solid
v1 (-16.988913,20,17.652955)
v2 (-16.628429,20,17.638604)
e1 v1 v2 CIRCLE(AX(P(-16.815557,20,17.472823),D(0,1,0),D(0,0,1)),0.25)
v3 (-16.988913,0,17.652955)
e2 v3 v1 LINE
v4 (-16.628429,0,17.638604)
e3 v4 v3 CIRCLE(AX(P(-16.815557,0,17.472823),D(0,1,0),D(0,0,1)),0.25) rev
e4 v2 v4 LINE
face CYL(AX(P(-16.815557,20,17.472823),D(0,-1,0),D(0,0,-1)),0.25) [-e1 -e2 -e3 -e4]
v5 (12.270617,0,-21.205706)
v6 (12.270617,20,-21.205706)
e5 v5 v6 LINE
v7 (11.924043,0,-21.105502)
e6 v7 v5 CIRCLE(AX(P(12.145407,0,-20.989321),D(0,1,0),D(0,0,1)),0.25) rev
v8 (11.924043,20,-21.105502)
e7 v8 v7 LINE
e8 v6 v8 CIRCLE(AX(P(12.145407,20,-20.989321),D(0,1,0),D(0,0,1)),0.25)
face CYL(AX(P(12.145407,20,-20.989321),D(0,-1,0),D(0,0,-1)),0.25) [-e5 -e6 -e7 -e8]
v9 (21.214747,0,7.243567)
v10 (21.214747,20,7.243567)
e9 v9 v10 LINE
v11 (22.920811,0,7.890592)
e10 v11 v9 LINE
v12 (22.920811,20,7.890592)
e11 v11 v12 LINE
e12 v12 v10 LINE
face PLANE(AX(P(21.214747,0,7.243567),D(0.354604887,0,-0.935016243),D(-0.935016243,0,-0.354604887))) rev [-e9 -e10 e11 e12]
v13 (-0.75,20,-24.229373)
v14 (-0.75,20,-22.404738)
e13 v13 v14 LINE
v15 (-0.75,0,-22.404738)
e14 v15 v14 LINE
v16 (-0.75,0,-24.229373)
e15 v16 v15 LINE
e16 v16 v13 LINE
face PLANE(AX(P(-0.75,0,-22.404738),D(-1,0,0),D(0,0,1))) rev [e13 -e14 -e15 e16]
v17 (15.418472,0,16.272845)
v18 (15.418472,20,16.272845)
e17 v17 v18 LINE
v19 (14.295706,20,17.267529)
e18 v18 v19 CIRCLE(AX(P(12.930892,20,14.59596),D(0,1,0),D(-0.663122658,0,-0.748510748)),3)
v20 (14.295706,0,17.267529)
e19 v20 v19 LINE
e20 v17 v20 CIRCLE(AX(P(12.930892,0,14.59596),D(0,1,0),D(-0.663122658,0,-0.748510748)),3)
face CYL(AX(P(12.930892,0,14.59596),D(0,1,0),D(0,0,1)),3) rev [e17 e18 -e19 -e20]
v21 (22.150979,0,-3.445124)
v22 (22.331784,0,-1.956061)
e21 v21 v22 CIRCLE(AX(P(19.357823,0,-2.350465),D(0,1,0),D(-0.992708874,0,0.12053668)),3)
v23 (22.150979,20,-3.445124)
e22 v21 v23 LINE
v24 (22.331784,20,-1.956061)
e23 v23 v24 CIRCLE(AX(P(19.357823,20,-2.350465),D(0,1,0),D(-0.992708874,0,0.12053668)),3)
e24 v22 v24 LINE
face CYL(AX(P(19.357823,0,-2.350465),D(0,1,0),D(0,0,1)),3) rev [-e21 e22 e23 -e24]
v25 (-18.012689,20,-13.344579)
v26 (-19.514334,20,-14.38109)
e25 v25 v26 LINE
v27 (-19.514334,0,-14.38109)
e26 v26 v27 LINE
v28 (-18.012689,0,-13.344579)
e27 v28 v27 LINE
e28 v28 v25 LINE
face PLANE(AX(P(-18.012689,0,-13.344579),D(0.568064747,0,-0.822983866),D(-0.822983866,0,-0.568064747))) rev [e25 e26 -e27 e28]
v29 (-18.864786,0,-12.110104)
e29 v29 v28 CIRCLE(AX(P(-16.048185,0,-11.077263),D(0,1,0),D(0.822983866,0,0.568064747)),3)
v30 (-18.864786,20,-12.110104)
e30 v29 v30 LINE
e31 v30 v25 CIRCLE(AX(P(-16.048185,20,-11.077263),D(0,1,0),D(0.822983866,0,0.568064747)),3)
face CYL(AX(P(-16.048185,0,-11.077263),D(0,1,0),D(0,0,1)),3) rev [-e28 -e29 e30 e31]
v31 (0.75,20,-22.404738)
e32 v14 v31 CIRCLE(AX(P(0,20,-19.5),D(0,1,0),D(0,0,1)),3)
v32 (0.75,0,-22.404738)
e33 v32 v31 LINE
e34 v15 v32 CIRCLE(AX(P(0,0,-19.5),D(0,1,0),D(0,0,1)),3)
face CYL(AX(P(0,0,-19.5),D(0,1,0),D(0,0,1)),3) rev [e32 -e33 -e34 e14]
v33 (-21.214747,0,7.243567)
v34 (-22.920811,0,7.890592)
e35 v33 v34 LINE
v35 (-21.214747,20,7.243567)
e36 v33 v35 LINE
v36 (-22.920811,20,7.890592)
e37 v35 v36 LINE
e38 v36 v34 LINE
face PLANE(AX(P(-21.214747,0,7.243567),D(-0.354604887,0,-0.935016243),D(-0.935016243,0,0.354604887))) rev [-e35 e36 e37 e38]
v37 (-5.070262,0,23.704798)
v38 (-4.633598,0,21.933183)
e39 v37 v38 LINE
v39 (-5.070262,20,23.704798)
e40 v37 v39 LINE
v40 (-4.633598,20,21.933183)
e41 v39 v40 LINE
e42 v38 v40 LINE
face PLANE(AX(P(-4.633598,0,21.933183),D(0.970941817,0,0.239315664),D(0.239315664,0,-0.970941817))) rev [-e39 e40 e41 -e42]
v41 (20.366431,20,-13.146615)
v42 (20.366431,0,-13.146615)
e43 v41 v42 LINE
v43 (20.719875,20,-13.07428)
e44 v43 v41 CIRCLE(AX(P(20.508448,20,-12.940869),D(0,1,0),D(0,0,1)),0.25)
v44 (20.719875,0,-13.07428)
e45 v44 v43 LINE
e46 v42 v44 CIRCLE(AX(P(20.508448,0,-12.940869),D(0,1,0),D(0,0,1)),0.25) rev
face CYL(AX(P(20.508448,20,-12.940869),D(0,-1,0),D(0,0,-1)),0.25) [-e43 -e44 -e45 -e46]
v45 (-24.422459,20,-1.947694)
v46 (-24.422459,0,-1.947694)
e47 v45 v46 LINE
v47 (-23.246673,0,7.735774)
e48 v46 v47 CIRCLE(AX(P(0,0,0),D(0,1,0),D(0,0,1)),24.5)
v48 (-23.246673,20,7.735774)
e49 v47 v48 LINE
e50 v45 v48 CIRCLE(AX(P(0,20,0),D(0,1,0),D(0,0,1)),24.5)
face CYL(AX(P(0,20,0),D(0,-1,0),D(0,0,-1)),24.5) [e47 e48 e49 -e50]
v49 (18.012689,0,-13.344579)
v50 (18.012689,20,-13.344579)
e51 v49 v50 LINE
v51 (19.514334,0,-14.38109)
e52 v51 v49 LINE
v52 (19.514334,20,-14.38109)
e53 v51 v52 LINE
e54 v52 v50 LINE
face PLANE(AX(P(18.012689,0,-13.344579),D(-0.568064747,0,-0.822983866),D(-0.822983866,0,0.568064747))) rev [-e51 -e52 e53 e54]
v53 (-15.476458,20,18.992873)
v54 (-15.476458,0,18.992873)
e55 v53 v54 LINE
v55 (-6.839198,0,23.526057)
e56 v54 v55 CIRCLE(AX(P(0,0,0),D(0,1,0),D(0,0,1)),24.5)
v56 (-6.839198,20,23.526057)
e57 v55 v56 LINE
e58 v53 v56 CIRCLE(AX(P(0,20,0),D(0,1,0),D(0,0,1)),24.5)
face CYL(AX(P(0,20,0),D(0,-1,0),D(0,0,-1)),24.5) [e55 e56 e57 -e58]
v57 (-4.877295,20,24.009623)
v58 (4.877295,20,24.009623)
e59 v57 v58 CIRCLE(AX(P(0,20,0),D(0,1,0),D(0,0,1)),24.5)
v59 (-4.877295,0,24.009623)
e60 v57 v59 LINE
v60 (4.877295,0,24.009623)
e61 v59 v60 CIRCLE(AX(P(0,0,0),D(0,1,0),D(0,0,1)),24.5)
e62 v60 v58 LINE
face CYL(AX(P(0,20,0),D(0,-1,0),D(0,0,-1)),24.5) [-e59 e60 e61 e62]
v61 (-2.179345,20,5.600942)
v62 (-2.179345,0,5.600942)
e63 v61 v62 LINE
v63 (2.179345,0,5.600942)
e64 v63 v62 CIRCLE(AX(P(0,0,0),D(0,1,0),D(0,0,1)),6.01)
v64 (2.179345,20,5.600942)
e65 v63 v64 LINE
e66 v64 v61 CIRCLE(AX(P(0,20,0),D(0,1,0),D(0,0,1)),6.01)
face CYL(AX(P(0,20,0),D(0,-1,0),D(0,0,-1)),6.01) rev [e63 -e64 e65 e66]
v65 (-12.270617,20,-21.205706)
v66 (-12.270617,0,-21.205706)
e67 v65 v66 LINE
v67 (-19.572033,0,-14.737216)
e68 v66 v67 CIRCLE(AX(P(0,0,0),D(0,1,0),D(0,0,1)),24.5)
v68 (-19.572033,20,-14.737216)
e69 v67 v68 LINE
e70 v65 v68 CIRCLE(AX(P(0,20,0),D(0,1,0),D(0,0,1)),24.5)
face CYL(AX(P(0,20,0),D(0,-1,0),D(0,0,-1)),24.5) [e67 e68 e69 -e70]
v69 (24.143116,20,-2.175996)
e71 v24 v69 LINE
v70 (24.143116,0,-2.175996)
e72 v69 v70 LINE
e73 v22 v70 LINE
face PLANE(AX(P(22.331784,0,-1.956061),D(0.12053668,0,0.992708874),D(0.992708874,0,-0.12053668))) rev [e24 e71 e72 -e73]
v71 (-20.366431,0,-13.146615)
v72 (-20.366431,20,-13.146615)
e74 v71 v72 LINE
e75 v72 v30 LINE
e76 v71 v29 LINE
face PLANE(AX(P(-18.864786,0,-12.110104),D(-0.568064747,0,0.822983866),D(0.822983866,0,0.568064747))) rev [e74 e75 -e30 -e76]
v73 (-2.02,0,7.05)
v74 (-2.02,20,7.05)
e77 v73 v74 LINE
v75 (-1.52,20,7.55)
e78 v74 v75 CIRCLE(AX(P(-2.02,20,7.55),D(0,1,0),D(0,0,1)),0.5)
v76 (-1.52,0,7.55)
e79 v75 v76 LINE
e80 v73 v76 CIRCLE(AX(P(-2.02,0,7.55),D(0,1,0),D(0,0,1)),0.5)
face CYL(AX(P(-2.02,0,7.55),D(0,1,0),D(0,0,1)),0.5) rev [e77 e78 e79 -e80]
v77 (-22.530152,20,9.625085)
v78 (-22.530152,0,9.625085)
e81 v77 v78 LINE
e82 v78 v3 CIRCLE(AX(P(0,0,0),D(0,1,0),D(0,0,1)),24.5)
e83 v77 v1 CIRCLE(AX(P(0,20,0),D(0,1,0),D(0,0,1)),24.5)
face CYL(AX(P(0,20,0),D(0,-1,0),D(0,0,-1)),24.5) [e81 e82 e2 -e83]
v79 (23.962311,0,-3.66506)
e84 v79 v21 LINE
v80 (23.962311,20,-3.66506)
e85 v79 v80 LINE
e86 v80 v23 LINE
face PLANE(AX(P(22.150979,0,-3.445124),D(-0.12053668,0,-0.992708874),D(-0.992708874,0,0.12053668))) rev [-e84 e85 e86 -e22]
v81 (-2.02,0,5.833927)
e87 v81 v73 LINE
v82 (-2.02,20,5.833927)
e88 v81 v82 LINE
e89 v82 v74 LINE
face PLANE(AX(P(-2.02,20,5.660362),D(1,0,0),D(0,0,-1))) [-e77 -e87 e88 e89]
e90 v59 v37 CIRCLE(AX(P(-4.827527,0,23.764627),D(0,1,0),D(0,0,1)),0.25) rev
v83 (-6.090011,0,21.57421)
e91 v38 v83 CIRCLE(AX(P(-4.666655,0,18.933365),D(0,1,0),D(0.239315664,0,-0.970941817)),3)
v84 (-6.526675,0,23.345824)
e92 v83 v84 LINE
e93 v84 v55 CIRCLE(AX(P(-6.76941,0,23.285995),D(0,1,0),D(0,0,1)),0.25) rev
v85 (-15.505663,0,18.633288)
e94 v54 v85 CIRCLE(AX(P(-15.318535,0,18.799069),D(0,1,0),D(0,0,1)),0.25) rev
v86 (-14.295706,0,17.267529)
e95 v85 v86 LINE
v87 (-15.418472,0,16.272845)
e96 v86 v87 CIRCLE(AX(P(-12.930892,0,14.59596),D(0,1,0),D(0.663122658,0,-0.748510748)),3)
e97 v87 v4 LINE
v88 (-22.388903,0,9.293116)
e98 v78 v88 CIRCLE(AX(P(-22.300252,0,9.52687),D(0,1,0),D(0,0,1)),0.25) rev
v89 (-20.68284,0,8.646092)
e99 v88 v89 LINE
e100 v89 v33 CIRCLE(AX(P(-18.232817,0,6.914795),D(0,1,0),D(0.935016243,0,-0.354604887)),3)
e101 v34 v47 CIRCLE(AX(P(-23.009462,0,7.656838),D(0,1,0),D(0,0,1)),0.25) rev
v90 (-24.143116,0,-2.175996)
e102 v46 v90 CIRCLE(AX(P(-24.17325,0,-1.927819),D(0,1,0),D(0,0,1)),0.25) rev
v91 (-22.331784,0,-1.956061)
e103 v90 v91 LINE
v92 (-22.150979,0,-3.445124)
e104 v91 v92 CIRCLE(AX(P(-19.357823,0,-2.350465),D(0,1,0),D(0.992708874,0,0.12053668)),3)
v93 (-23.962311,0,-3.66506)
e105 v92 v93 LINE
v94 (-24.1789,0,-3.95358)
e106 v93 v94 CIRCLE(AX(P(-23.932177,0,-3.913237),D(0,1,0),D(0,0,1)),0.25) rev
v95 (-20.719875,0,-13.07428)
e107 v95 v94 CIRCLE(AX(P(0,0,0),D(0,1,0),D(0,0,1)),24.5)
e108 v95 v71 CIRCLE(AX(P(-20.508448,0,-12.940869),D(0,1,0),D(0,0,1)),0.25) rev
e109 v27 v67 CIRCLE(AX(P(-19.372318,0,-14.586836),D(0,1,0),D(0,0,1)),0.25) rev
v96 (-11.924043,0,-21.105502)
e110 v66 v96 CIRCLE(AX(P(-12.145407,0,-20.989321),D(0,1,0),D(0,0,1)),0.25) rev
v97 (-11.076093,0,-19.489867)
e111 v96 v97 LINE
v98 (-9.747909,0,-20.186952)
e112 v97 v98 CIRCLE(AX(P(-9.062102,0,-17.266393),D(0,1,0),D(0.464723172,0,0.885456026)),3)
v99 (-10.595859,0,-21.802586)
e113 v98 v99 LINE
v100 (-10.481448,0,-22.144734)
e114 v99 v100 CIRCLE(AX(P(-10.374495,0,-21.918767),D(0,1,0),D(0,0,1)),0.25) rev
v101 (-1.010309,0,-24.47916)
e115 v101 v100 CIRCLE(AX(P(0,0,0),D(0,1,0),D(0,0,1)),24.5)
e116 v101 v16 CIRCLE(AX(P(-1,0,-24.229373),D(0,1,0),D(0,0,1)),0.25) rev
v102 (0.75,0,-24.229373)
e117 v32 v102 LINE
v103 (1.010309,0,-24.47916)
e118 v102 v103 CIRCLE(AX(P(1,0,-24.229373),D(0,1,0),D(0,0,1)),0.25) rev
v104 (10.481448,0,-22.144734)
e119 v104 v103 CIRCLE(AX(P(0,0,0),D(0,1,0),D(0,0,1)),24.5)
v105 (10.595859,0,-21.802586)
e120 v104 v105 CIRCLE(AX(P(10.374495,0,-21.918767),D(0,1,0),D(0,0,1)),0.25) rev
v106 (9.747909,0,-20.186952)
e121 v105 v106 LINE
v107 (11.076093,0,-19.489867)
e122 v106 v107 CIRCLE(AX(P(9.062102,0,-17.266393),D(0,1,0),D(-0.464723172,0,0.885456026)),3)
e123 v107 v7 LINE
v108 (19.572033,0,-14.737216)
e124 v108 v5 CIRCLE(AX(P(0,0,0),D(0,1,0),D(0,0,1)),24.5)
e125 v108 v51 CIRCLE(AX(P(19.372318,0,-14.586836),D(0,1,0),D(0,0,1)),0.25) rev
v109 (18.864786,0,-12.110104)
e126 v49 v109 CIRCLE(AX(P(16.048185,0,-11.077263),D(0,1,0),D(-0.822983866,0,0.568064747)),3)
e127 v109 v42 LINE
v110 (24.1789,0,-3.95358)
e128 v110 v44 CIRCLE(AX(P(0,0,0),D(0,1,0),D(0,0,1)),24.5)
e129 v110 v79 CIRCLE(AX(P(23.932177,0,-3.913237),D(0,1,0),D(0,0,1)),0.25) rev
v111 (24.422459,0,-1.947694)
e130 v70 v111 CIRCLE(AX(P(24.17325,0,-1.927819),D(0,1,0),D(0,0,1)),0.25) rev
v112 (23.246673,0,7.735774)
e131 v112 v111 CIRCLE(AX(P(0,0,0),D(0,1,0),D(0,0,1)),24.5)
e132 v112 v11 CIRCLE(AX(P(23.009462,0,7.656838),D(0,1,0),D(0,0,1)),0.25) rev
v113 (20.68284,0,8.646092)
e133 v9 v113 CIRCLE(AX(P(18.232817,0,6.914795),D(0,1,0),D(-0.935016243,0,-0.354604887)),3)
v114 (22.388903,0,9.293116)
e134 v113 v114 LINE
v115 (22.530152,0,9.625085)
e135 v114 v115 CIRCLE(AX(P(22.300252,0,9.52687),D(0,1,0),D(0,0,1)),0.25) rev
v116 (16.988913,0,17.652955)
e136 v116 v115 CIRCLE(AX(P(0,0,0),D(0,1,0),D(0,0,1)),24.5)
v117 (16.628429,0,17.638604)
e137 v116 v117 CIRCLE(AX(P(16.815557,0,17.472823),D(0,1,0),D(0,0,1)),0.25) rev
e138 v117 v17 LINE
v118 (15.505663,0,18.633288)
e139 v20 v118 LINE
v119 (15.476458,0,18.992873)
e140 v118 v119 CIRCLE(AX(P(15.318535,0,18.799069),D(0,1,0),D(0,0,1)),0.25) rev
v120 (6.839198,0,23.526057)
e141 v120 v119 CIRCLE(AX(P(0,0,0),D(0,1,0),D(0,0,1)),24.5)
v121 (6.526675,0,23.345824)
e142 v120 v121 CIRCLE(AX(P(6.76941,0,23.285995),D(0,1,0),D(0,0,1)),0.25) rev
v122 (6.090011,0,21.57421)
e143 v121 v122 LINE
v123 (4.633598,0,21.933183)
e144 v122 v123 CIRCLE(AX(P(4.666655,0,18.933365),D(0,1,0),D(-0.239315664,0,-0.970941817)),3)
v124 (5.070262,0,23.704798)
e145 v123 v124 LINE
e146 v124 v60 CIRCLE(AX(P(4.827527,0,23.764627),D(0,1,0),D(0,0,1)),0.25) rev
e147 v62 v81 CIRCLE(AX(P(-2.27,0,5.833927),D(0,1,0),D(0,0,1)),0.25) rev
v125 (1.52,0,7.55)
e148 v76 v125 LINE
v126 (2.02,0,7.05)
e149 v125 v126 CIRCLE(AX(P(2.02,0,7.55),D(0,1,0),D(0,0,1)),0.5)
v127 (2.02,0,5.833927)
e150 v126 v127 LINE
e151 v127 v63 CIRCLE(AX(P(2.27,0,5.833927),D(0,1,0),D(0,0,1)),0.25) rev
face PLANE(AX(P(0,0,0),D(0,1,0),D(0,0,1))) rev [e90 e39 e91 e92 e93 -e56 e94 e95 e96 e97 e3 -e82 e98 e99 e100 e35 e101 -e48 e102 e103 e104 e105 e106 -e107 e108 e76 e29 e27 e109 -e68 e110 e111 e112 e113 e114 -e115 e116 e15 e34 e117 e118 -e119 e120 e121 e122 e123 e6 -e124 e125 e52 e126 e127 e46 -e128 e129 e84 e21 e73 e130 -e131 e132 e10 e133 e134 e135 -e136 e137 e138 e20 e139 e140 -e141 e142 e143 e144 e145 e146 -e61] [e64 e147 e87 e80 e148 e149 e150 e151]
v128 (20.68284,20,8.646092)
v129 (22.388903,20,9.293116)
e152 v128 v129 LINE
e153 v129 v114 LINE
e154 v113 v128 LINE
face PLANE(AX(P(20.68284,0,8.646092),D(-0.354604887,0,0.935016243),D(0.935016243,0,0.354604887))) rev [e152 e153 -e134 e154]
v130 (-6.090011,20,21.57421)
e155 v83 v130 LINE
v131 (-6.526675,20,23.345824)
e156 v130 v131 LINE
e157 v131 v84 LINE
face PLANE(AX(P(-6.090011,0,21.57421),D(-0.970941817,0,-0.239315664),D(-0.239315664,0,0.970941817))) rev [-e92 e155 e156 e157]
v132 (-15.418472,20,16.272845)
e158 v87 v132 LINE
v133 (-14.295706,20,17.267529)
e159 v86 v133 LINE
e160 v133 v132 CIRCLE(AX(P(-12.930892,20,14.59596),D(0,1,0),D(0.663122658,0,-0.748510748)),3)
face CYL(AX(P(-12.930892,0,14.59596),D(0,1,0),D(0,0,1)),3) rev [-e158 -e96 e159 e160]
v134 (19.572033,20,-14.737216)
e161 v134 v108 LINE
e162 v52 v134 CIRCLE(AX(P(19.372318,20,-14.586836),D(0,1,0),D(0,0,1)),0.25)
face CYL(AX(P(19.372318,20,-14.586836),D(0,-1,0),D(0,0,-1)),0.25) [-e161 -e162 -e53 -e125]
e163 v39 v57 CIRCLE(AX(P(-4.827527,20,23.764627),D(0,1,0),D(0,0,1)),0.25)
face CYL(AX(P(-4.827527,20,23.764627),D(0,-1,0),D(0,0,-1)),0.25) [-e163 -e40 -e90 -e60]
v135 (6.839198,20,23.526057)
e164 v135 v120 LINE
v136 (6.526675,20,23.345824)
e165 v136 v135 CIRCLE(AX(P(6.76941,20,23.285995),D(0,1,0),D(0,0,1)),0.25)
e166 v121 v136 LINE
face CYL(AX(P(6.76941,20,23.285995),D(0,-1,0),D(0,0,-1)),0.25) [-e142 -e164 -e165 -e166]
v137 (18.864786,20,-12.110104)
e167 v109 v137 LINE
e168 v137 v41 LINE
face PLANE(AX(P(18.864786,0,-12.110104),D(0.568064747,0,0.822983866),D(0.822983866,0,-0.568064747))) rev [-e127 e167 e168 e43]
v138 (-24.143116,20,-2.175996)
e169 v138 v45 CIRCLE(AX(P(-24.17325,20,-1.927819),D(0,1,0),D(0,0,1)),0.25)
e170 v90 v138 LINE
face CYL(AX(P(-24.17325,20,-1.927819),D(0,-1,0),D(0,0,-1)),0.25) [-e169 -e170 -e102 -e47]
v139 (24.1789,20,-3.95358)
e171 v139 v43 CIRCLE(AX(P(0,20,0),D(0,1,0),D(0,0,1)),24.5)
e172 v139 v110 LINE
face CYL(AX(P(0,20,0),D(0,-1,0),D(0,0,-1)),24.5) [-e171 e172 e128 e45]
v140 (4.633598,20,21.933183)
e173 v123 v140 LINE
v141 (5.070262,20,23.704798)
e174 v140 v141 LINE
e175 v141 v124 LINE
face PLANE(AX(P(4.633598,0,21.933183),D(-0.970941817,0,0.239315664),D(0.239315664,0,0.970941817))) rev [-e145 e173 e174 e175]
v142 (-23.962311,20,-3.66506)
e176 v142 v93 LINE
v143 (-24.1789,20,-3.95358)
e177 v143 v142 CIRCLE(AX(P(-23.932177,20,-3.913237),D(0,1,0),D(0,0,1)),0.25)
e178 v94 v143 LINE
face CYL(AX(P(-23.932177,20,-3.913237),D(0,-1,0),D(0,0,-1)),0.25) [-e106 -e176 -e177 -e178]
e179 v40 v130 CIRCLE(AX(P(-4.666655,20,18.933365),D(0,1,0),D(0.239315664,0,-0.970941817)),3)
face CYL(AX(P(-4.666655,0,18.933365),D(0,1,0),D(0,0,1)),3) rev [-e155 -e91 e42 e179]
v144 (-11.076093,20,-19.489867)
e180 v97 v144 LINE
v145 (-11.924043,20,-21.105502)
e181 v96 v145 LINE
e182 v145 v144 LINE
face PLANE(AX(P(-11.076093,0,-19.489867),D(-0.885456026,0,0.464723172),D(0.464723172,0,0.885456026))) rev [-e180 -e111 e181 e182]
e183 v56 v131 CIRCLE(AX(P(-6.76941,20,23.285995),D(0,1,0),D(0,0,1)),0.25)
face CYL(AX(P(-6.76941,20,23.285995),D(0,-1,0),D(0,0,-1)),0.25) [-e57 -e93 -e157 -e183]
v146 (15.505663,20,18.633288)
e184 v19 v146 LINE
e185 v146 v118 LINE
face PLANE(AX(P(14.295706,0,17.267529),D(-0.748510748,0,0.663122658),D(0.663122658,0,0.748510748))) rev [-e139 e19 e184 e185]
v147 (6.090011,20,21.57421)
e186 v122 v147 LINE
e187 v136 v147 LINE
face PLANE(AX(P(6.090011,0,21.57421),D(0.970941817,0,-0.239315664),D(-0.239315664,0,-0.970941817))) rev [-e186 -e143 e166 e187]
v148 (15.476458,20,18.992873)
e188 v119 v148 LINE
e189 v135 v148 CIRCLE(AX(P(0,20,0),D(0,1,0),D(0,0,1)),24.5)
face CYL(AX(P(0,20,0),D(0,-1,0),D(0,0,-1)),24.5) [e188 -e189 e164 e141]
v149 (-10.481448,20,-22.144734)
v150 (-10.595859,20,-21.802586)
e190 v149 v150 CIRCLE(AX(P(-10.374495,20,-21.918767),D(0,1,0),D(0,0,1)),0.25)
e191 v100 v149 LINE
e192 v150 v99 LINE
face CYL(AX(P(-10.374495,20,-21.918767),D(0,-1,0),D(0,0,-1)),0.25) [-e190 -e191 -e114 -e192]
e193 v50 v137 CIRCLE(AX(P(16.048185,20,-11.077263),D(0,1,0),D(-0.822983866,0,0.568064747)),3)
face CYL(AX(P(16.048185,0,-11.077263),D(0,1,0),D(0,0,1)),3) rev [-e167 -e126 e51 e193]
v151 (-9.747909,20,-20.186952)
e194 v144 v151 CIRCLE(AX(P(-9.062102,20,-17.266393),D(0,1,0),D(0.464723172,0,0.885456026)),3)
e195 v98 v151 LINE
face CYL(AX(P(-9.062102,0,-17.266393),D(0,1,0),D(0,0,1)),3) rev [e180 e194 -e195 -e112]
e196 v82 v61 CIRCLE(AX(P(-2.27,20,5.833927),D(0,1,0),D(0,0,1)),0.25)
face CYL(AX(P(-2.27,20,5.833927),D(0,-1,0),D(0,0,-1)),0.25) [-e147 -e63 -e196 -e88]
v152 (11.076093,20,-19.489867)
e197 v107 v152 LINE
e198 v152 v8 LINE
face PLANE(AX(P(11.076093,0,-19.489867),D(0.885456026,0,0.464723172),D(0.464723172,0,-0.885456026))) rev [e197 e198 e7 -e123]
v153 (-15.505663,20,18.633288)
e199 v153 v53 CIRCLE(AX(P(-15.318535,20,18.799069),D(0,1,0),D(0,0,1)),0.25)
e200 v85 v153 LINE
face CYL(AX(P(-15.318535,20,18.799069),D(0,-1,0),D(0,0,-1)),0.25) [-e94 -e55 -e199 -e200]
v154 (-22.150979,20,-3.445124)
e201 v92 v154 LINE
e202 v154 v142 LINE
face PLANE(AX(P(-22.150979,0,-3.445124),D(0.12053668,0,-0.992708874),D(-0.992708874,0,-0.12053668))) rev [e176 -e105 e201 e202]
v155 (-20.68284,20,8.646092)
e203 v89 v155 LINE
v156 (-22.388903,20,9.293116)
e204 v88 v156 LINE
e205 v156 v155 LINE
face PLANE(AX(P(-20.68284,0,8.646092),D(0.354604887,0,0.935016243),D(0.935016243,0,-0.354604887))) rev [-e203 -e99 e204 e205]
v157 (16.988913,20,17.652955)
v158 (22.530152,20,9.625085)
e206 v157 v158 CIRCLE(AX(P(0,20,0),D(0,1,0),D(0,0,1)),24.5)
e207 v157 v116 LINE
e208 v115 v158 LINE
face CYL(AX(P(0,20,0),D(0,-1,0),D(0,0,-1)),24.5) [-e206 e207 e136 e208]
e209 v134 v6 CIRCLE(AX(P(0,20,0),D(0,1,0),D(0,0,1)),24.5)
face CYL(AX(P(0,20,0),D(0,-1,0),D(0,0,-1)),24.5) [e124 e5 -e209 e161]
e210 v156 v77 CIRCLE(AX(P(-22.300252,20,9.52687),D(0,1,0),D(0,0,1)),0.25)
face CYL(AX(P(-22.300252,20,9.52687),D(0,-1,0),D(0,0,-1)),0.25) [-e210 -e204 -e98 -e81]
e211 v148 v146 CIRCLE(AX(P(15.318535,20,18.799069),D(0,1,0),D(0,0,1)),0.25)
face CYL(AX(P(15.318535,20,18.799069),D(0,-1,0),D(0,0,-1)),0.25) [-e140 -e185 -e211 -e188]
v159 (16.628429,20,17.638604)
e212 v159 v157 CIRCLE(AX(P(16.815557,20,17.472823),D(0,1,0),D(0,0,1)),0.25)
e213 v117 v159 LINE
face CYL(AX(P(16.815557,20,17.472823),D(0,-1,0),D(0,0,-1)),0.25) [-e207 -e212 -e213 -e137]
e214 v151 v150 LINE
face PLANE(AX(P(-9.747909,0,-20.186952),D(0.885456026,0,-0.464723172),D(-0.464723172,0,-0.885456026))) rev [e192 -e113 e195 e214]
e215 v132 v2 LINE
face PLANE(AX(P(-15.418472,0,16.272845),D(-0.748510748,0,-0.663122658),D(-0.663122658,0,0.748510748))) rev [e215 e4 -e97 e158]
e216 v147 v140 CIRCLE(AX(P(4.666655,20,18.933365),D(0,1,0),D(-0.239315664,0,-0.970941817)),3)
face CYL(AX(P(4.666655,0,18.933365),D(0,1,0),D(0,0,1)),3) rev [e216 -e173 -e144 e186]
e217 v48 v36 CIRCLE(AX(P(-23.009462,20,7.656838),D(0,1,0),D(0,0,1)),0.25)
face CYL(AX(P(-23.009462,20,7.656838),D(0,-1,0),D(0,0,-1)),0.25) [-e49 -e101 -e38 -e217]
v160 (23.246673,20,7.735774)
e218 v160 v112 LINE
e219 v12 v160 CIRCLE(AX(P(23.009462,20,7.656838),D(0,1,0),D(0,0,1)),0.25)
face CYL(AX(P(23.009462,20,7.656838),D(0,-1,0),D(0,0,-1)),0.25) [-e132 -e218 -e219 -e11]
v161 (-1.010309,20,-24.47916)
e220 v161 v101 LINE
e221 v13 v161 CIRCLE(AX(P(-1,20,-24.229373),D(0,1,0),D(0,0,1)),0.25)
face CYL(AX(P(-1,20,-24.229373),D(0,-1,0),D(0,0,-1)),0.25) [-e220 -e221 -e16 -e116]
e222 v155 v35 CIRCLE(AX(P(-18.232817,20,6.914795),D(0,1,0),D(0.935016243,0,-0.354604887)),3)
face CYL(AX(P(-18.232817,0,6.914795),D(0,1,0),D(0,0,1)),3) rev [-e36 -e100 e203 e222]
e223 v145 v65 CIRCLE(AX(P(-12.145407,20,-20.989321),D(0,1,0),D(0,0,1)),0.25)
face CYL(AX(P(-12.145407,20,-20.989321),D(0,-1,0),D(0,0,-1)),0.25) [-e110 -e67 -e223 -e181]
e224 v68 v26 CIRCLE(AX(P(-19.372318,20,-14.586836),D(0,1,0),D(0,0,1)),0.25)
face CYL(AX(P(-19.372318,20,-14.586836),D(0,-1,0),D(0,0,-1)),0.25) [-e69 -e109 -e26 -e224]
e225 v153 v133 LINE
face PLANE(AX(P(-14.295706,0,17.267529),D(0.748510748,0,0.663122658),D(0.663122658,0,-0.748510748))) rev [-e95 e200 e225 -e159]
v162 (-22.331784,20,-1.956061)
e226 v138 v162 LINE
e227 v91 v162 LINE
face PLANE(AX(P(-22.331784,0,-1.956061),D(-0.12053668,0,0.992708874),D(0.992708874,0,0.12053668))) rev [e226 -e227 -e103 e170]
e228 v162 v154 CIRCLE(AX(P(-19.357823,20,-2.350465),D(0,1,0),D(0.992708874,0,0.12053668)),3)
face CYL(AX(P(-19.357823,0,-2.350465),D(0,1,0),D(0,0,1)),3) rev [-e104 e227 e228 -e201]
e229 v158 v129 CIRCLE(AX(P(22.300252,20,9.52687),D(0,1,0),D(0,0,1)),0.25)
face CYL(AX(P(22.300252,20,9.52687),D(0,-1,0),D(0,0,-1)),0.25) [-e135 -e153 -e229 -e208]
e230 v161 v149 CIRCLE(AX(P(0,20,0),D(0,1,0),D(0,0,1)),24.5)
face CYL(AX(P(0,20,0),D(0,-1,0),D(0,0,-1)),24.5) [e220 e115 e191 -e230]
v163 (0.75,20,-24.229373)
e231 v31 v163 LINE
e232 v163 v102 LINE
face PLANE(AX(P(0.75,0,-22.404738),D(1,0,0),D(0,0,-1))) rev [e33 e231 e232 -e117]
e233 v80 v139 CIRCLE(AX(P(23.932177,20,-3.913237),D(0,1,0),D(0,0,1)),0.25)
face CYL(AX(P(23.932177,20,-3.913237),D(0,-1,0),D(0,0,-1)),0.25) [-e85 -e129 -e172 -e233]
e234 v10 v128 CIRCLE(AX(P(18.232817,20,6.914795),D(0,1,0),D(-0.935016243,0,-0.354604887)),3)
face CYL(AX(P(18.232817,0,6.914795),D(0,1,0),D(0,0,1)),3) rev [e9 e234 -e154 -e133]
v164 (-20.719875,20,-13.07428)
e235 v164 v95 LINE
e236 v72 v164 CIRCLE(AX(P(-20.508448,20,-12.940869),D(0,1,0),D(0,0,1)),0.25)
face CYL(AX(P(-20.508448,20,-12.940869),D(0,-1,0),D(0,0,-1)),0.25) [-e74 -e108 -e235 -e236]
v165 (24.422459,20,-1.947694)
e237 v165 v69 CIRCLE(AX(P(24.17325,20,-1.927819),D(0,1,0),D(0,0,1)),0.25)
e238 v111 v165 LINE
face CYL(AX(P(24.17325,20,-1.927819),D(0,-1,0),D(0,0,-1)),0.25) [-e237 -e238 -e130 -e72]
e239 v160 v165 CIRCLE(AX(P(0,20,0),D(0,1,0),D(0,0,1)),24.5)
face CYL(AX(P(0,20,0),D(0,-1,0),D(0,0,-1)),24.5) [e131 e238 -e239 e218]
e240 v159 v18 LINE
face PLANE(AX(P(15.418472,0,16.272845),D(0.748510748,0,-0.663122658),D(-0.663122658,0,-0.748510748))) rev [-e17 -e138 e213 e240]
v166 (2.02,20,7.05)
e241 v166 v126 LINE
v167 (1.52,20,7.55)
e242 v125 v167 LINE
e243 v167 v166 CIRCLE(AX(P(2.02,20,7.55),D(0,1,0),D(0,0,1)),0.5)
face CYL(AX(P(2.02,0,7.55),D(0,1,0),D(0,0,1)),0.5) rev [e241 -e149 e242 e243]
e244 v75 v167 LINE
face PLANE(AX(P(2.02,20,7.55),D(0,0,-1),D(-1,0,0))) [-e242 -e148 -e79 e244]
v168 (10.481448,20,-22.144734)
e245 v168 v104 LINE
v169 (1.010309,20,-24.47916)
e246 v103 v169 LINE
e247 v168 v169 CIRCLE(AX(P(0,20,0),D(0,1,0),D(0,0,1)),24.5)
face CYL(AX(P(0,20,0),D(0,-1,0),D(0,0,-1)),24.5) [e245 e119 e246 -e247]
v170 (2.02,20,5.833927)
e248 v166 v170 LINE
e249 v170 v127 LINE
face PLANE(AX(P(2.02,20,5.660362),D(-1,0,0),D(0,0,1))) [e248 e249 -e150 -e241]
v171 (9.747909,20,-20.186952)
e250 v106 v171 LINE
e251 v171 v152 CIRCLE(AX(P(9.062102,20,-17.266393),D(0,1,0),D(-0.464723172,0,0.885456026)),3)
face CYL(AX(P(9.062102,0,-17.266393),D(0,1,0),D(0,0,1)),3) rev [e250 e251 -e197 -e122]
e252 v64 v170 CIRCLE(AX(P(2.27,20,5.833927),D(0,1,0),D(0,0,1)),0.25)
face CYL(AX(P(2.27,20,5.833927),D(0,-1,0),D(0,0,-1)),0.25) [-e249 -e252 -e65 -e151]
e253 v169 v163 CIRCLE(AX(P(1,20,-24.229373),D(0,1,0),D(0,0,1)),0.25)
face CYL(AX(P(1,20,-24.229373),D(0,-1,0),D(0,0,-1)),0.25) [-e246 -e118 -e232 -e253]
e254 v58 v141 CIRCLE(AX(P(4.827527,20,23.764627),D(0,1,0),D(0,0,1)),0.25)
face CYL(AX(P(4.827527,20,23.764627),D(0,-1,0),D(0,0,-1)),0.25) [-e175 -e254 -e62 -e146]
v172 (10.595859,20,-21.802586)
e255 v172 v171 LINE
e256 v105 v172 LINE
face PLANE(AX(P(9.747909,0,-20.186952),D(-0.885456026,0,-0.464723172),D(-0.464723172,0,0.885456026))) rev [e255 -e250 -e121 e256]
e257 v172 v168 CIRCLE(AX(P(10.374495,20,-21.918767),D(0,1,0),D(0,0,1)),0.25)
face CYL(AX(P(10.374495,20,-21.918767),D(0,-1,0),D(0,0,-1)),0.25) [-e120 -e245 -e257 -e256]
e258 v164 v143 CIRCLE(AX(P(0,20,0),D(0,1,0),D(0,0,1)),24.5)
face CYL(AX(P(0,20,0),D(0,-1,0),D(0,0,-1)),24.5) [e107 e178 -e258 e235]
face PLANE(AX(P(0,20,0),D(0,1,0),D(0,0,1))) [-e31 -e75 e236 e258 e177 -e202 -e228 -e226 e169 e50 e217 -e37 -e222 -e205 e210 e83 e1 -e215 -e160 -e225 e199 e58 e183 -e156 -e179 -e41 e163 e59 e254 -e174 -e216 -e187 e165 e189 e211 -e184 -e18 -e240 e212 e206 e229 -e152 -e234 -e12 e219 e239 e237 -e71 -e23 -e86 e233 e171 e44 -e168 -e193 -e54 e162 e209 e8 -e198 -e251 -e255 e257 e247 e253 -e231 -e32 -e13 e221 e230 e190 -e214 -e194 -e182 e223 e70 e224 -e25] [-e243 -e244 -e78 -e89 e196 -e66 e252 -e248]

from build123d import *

# Parameters (mm, degrees)
SKETCH1_R           = 24.5
BOSS_EXTRUDE1_DEPTH = 20
SLOT_DEPTH          = 41.006249512
SKETCH4_R           = 0.5
RELIEFS_DEPTH       = 41.006249512
FILLET1_R           = 0.25
CIRPATTERN1_DEPTH   = 20


# Read off the part's stored shape, not the designer's step: CirPattern1
with BuildPart() as part:
    # Sketch1 → Boss-Extrude1 (new body)
    with BuildSketch(Plane(origin=(0, 0, 0), x_dir=(1, 0, 0), z_dir=(0, 1, 0))):
        with Locations(Location((0, 0, 0), (0, 0, 270))):
            Circle(SKETCH1_R)
        with BuildLine():
            Line((2.02, -5.660362179), (2.02, -7.55))
            Line((2.02, -7.55), (-2.02, -7.55))
            Line((-2.02, -7.55), (-2.02, -5.660362179))
            ThreePointArc((-2.02, -5.660362179), (0, 6.01), (2.02, -5.660362179))
        make_face(mode=Mode.SUBTRACT)
    extrude(amount=BOSS_EXTRUDE1_DEPTH)

    # Sketch3 → Slot (cut, through all)
    with BuildSketch(Plane(origin=(0, 20, 0), x_dir=(1, 0, 0), z_dir=(0, 1, 0))):
        with BuildLine():
            Line((0.75, 22.40473751), (0.75, 24.5))
            Line((0.75, 24.5), (-0.75, 24.5))
            Line((-0.75, 24.5), (-0.75, 22.40473751))
            ThreePointArc((-0.75, 22.40473751), (0, 16.5), (0.75, 22.40473751))
        make_face()
    extrude(amount=-SLOT_DEPTH, mode=Mode.SUBTRACT)

    # Sketch4 → Reliefs (cut, through all)
    with BuildSketch(Plane(origin=(0, 20, 0), x_dir=(1, 0, 0), z_dir=(0, 1, 0))):
        with Locations((2.02, -7.55)):
            Circle(SKETCH4_R)
        with Locations((-2.02, -7.55)):
            Circle(SKETCH4_R)
    extrude(amount=-RELIEFS_DEPTH, mode=Mode.SUBTRACT)

    # Fillet1
    fillet1_edges = [part.edges().sort_by_distance(p)[0] for p in [
        (0.75, 10, -24.488517717),
        (-0.75, 10, -24.488517717),
        (-2.02, 10, 5.660362179),
        (2.02, 10, 5.660362179),
    ]]
    fillet(fillet1_edges, radius=FILLET1_R)

    # CirPattern1 outline → CirPattern1 (cut)
    with BuildSketch(Plane(origin=(0, 0, 0), x_dir=(1, 0, 0), z_dir=(0, 1, 0))):
        with BuildLine():
            ThreePointArc((-12.270617331, 21.205705608), (-12.075969293, 21.229484159), (-11.924042943, 21.10550165))
            Line((-11.924042943, 21.10550165), (-11.076092704, 19.489867452))
            ThreePointArc((-11.076092704, 19.489867452), (-7.66793234, 14.610024423), (-9.747908665, 20.18695221))
            Line((-9.747908665, 20.18695221), (-10.595858905, 21.802586408))
            ThreePointArc((-10.595858905, 21.802586408), (-10.611590506, 21.998049435), (-10.481448454, 22.144733873))
            ThreePointArc((-10.481448454, 22.144733873), (-11.385717715, 21.693672628), (-12.270617331, 21.205705608))
        make_face()
        with BuildLine():
            ThreePointArc((11.924042943, 21.10550165), (12.075969293, 21.229484159), (12.270617331, 21.205705608))
            ThreePointArc((12.270617331, 21.205705608), (11.385717715, 21.693672628), (10.481448454, 22.144733873))
            ThreePointArc((10.481448454, 22.144733873), (10.611590506, 21.998049435), (10.595858905, 21.802586408))
            Line((10.595858905, 21.802586408), (9.747908665, 20.18695221))
            ThreePointArc((9.747908665, 20.18695221), (7.66793234, 14.610024423), (11.076092704, 19.489867452))
            Line((11.076092704, 19.489867452), (11.924042943, 21.10550165))
        make_face()
        with BuildLine():
            ThreePointArc((20.366431348, 13.14661455), (20.558572994, 13.185791915), (20.719874829, 13.0742796))
            ThreePointArc((20.719874829, 13.0742796), (20.163104714, 13.917586295), (19.572032661, 14.737216071))
            ThreePointArc((19.572032661, 14.737216071), (19.619100068, 14.546853424), (19.514334228, 14.381090349))
            Line((19.514334228, 14.381090349), (18.01268893, 13.344579438))
            ThreePointArc((18.01268893, 13.344579438), (13.579233788, 9.37306832), (18.86478605, 12.11010364))
            Line((18.86478605, 12.11010364), (20.366431348, 13.14661455))
        make_face()
        with BuildLine():
            ThreePointArc((24.143115774, 2.175996491), (24.331455382, 2.121393649), (24.422458706, 1.947693698))
            ThreePointArc((24.422458706, 1.947693698), (24.321367415, 2.953148666), (24.178900053, 3.95357967))
            ThreePointArc((24.178900053, 3.95357967), (24.132110239, 3.763148603), (23.962310754, 3.665059802))
            Line((23.962310754, 3.665059802), (22.150979237, 3.445124337))
            ThreePointArc((22.150979237, 3.445124337), (16.379696423, 1.988855222), (22.331784258, 1.956061026))
            Line((22.331784258, 1.956061026), (24.143115774, 2.175996491))
        make_face()
        with BuildLine():
            ThreePointArc((22.388903332, -9.293116141), (22.530294567, -9.428990336), (22.530151616, -9.625085358))
            ThreePointArc((22.530151616, -9.625085358), (22.907897946, -8.687819733), (23.246672831, -7.735774188))
            ThreePointArc((23.246672831, -7.735774188), (23.116744778, -7.882648213), (22.920810662, -7.890591777))
            Line((22.920810662, -7.890591777), (21.21474715, -7.243567232))
            ThreePointArc((21.21474715, -7.243567232), (15.427768004, -5.850980635), (20.682839819, -8.646091596))
            Line((20.682839819, -8.646091596), (22.388903332, -9.293116141))
        make_face()
        with BuildLine():
            ThreePointArc((15.505662952, -18.633287859), (15.567714786, -18.819306267), (15.476458308, -18.992873354))
            ThreePointArc((15.476458308, -18.992873354), (16.246505127, -18.33851333), (16.988913016, -17.652955405))
            ThreePointArc((16.988913016, -17.652955405), (16.805611676, -17.722625319), (16.628429074, -17.638603872))
            Line((16.628429074, -17.638603872), (15.418472156, -16.272844842))
            ThreePointArc((15.418472156, -16.272844842), (10.941523861, -12.350427345), (14.295706033, -17.26752883))
            Line((14.295706033, -17.26752883), (15.505662952, -18.633287859))
        make_face()
        with BuildLine():
            ThreePointArc((5.070262053, -23.704797884), (5.038759159, -23.89834593), (4.877294914, -24.009622953))
            ThreePointArc((4.877294914, -24.009622953), (5.863233775, -23.788074527), (6.839197968, -23.52605728))
            ThreePointArc((6.839197968, -23.52605728), (6.644515468, -23.502562546), (6.526674779, -23.345824387))
            Line((6.526674779, -23.345824387), (6.090011003, -21.574209808))
            ThreePointArc((6.090011003, -21.574209808), (3.948708458, -16.020539989), (4.633598277, -21.933183305))
            Line((4.633598277, -21.933183305), (5.070262053, -23.704797884))
        make_face()
        with BuildLine():
            ThreePointArc((-6.526674779, -23.345824387), (-6.644515468, -23.502562546), (-6.839197968, -23.52605728))
            ThreePointArc((-6.839197968, -23.52605728), (-5.863233775, -23.788074527), (-4.877294914, -24.009622953))
            ThreePointArc((-4.877294914, -24.009622953), (-5.038759159, -23.89834593), (-5.070262053, -23.704797884))
            Line((-5.070262053, -23.704797884), (-4.633598277, -21.933183305))
            ThreePointArc((-4.633598277, -21.933183305), (-3.948708458, -16.020539989), (-6.090011003, -21.574209808))
            Line((-6.090011003, -21.574209808), (-6.526674779, -23.345824387))
        make_face()
        with BuildLine():
            ThreePointArc((-16.628429074, -17.638603872), (-16.805611676, -17.722625319), (-16.988913016, -17.652955405))
            ThreePointArc((-16.988913016, -17.652955405), (-16.246505127, -18.33851333), (-15.476458308, -18.992873354))
            ThreePointArc((-15.476458308, -18.992873354), (-15.567714786, -18.819306267), (-15.505662952, -18.633287859))
            Line((-15.505662952, -18.633287859), (-14.295706033, -17.26752883))
            ThreePointArc((-14.295706033, -17.26752883), (-10.941523861, -12.350427345), (-15.418472156, -16.272844842))
            Line((-15.418472156, -16.272844842), (-16.628429074, -17.638603872))
        make_face()
        with BuildLine():
            ThreePointArc((-22.920810662, -7.890591777), (-23.116744778, -7.882648213), (-23.246672831, -7.735774188))
            ThreePointArc((-23.246672831, -7.735774188), (-22.907897946, -8.687819733), (-22.530151616, -9.625085358))
            ThreePointArc((-22.530151616, -9.625085358), (-22.530294567, -9.428990336), (-22.388903332, -9.293116141))
            Line((-22.388903332, -9.293116141), (-20.682839819, -8.646091596))
            ThreePointArc((-20.682839819, -8.646091596), (-15.427768004, -5.850980635), (-21.21474715, -7.243567232))
            Line((-21.21474715, -7.243567232), (-22.920810662, -7.890591777))
        make_face()
        with BuildLine():
            ThreePointArc((-23.962310754, 3.665059802), (-24.132110239, 3.763148603), (-24.178900053, 3.95357967))
            ThreePointArc((-24.178900053, 3.95357967), (-24.321367415, 2.953148666), (-24.422458706, 1.947693698))
            ThreePointArc((-24.422458706, 1.947693698), (-24.331455382, 2.121393649), (-24.143115774, 2.175996491))
            Line((-24.143115774, 2.175996491), (-22.331784258, 1.956061026))
            ThreePointArc((-22.331784258, 1.956061026), (-16.379696423, 1.988855222), (-22.150979237, 3.445124337))
            Line((-22.150979237, 3.445124337), (-23.962310754, 3.665059802))
        make_face()
        with BuildLine():
            ThreePointArc((-19.514334228, 14.381090349), (-19.619100068, 14.546853424), (-19.572032661, 14.737216071))
            ThreePointArc((-19.572032661, 14.737216071), (-20.163104714, 13.917586295), (-20.719874829, 13.0742796))
            ThreePointArc((-20.719874829, 13.0742796), (-20.558572994, 13.185791915), (-20.366431348, 13.14661455))
            Line((-20.366431348, 13.14661455), (-18.86478605, 12.11010364))
            ThreePointArc((-18.86478605, 12.11010364), (-13.579233788, 9.37306832), (-18.01268893, 13.344579438))
            Line((-18.01268893, 13.344579438), (-19.514334228, 14.381090349))
        make_face()
    extrude(amount=CIRPATTERN1_DEPTH, mode=Mode.SUBTRACT)


solid = part.part
